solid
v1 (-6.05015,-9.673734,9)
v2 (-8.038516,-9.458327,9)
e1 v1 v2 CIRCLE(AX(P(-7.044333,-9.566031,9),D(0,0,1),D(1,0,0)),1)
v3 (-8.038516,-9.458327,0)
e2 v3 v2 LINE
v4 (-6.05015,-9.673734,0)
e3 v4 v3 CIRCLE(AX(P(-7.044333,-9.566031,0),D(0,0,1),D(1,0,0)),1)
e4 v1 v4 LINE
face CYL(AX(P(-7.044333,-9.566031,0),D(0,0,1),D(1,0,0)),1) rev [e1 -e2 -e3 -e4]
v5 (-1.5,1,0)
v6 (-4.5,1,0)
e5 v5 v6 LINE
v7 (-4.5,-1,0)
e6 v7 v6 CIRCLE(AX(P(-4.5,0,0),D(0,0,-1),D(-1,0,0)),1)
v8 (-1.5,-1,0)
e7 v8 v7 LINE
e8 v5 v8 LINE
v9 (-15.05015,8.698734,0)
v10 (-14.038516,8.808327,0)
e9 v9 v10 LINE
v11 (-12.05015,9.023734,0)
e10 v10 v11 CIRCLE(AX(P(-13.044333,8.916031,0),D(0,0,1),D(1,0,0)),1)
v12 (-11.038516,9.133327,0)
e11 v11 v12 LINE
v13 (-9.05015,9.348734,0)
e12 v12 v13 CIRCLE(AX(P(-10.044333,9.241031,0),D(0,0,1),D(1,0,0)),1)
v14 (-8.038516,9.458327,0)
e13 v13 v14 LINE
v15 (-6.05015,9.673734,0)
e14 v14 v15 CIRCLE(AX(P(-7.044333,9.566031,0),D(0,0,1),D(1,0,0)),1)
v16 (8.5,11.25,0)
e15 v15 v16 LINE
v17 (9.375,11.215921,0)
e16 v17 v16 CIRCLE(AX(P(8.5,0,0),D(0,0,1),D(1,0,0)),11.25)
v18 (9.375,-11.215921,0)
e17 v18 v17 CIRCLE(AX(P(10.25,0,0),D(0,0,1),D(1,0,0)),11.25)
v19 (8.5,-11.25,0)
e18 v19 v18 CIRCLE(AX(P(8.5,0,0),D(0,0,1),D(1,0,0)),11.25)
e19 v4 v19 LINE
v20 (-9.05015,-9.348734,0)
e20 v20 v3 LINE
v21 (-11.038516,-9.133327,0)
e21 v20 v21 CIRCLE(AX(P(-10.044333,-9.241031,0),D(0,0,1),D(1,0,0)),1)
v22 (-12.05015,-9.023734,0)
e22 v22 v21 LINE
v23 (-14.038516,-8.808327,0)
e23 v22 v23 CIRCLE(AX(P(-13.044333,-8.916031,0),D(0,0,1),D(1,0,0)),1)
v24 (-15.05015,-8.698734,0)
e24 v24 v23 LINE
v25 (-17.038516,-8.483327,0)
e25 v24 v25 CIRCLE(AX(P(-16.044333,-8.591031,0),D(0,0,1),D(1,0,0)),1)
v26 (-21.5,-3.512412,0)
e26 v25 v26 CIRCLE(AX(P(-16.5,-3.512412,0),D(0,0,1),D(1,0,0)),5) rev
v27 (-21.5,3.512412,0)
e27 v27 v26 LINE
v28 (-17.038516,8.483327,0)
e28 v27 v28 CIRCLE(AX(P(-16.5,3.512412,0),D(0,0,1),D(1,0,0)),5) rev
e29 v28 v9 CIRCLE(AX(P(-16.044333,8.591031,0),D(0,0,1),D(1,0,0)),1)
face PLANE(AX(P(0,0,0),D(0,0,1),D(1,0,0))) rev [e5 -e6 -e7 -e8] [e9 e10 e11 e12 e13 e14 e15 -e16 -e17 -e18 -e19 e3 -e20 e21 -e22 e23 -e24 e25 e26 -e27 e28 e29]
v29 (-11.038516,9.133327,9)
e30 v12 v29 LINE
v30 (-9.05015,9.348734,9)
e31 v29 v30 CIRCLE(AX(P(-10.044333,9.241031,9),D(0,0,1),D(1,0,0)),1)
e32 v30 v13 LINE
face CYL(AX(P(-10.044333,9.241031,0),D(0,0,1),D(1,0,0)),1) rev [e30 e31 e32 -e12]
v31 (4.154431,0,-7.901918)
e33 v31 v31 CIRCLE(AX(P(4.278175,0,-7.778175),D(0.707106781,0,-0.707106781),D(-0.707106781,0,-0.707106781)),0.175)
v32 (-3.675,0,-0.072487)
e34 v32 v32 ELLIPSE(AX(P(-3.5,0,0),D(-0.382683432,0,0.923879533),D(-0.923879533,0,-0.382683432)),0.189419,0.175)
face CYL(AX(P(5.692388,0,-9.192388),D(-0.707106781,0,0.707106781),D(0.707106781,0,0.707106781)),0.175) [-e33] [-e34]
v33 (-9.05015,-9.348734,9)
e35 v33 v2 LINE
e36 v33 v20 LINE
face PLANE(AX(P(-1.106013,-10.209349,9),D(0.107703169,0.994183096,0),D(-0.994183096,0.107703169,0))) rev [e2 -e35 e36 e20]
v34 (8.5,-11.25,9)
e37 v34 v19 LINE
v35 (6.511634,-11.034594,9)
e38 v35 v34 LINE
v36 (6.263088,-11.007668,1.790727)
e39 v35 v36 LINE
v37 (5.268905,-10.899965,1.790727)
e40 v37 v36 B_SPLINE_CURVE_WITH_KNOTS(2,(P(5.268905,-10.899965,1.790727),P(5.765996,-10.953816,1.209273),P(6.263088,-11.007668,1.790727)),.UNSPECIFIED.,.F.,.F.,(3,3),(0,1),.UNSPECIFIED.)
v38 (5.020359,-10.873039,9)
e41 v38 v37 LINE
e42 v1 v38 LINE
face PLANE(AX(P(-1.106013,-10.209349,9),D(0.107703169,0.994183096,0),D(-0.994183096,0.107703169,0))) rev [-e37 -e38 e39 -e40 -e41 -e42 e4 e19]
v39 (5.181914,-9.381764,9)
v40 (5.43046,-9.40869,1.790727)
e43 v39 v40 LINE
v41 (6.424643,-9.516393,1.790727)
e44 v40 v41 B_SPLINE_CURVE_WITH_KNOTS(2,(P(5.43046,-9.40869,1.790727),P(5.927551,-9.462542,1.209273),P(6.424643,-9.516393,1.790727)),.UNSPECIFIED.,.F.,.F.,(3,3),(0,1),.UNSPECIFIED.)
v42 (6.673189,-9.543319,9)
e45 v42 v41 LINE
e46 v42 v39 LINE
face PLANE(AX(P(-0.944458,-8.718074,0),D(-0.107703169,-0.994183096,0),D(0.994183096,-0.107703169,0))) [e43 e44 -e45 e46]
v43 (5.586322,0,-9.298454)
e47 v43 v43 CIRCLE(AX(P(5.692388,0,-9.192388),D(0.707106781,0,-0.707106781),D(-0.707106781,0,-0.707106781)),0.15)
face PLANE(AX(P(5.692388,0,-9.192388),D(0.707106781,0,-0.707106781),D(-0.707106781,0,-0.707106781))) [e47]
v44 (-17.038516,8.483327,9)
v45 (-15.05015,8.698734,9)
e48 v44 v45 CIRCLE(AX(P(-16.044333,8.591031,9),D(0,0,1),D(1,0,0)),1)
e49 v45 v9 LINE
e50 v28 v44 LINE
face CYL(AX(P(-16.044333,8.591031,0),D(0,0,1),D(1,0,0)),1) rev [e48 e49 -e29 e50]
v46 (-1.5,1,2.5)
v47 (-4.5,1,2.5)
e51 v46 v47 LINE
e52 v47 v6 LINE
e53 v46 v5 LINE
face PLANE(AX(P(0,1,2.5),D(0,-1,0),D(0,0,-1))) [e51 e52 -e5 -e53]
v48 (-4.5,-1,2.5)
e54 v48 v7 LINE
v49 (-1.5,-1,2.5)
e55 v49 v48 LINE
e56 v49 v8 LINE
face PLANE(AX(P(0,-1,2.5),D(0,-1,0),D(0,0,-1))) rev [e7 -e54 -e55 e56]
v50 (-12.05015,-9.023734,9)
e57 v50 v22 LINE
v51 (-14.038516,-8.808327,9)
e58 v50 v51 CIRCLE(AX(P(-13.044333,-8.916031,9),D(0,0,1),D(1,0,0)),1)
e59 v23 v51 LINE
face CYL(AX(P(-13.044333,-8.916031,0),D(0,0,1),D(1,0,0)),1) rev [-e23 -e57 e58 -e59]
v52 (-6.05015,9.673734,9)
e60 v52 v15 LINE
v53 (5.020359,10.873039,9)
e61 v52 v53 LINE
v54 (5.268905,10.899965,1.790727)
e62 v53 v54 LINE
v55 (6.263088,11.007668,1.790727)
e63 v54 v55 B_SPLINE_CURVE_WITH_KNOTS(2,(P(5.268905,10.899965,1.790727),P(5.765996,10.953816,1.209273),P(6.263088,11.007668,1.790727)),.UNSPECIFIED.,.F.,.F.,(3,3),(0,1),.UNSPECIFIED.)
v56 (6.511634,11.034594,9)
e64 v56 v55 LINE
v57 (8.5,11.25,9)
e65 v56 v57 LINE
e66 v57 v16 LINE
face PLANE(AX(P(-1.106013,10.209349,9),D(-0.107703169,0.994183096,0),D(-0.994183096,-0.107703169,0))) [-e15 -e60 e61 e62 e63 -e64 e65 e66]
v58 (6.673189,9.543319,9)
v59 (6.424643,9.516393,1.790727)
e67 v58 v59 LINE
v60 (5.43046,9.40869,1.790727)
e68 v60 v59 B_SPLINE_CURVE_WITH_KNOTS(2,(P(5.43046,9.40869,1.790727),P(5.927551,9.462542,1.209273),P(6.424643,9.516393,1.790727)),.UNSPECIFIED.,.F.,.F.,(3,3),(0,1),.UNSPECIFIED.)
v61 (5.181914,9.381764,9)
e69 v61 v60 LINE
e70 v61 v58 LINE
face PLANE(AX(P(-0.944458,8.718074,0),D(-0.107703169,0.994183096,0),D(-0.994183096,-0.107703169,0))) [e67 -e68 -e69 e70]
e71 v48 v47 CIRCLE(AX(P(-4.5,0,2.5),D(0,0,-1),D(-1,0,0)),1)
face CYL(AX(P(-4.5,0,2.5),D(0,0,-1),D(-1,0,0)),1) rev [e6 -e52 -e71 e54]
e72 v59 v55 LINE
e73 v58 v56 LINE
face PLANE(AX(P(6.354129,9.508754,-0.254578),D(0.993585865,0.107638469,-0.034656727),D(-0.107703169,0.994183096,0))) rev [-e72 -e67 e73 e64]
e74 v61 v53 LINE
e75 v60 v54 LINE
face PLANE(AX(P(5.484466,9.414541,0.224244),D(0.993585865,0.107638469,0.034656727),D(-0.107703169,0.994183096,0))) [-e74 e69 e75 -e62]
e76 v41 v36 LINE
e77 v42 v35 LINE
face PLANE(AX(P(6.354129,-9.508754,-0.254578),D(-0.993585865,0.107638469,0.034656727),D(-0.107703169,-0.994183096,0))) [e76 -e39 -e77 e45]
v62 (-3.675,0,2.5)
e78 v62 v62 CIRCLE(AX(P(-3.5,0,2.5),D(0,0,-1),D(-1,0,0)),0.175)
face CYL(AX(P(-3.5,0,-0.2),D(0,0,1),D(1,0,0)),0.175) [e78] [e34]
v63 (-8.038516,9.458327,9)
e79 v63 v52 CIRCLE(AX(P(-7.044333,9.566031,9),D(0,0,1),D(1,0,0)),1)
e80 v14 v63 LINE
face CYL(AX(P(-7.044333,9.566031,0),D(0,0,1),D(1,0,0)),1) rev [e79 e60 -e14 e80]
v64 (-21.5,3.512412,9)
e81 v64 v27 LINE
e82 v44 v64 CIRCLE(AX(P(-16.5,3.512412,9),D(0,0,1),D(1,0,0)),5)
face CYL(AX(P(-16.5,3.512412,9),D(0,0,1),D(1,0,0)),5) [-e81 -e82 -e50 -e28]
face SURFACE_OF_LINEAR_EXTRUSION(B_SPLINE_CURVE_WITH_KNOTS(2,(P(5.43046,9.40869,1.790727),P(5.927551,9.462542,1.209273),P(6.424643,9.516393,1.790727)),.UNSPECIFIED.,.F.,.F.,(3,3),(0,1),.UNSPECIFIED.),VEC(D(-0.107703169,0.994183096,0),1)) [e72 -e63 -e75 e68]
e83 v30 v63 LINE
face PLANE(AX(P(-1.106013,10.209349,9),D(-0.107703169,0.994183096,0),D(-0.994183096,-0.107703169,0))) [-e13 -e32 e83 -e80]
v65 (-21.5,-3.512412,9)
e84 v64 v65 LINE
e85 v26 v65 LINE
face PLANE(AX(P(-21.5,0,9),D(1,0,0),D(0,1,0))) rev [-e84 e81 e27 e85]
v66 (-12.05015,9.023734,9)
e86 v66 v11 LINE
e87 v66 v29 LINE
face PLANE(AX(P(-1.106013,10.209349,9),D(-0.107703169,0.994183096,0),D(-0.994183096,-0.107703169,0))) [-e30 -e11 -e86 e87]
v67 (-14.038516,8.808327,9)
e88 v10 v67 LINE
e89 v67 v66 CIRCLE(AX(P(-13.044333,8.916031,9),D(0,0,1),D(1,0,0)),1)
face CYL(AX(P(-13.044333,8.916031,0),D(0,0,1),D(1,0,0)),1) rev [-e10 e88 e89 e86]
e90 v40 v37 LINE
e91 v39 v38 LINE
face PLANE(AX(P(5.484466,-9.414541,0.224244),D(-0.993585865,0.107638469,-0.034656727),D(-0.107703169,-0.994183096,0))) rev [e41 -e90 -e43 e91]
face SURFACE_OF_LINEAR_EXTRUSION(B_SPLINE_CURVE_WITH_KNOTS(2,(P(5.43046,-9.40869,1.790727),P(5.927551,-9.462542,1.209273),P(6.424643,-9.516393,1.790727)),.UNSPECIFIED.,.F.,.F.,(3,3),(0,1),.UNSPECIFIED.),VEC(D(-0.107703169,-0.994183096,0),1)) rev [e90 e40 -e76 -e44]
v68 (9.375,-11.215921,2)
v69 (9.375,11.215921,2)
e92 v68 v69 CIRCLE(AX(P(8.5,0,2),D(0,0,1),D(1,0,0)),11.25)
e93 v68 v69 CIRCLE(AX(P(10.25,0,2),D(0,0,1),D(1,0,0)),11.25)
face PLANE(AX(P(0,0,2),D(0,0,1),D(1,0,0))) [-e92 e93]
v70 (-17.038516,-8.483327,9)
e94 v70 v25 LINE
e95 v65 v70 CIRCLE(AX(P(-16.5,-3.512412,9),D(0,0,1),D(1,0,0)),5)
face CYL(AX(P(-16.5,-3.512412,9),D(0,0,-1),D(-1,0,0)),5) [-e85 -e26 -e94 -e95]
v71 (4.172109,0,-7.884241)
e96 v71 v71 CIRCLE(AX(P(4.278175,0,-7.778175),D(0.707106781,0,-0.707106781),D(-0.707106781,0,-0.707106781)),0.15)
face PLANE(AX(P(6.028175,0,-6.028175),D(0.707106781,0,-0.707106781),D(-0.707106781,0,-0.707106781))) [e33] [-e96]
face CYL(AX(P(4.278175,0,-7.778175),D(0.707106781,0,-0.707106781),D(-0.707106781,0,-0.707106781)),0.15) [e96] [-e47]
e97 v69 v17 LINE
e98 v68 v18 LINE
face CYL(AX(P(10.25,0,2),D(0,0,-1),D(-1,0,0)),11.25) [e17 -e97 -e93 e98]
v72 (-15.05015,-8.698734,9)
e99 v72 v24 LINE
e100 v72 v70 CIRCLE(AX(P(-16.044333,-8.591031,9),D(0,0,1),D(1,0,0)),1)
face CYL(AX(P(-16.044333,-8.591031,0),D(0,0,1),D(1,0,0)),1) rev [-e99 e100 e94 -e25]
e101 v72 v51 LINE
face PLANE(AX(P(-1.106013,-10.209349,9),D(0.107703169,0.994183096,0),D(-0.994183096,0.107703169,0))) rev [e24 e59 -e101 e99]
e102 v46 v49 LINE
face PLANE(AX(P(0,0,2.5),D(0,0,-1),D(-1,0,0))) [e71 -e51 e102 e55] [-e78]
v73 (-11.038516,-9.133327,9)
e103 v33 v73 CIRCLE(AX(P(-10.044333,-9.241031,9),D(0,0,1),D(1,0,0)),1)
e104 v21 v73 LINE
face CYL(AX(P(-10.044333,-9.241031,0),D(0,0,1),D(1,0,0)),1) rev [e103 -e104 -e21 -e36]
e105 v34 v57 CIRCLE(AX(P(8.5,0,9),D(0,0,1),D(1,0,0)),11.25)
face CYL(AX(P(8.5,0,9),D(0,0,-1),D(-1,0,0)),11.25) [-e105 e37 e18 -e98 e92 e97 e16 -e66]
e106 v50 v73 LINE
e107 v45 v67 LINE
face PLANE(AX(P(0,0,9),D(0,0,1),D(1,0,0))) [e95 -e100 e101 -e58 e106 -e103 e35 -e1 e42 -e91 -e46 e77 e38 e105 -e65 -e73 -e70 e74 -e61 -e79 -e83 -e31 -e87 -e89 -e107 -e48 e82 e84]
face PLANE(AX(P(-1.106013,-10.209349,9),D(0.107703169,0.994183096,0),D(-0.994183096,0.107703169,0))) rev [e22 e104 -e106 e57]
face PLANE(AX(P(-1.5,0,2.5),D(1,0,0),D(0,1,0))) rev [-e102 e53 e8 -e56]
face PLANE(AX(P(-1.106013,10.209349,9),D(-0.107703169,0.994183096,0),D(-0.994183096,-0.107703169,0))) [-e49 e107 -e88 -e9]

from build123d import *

# Parameters (mm, degrees)
SENSOR_HEIGHT_DEPTH               = 9
SENSOR_LIP_HEIGHT_DEPTH           = 2
SHORT_SIDE_EDGE_ROUNDING_R        = 5
SENSOR_HOLES_R                    = 1
EXTRUDED_SENSOR_HOLES_DEPTH       = 26.880736079
BOTTOM_TRIANGLE_CUT_DEPTH         = 1.5
TOP_TRIANGLE_CUT_DEPTH            = 1.5
FILAMENT_HOLE_CUT_DEPTH           = 2.5
FILAMENT_PROFILE_R                = 0.175
SENSING_START                     = -2
SENSING_FILAMENT_R                = 0.175
SENSING_FILAMENT_R_2              = 0.15
SENSING_PORTION_OF_FILAMENT_DEPTH = 2


# Read off the part's stored shape, not the designer's step: Sensor Lip Height
with BuildPart() as part:
    # Basic Sensor Dimensions → Sensor Height (new body)
    with BuildSketch(Plane.XY):
        with BuildLine():
            Line((-21.5, 8), (-21.5, -8))
            Line((-21.5, -8), (8.5, -11.25))
            ThreePointArc((8.5, -11.25), (19.75, 0), (8.5, 11.25))
            Line((8.5, 11.25), (-21.5, 8))
        make_face()
    extrude(amount=SENSOR_HEIGHT_DEPTH)

    # Sensor Lip Height outline → Sensor Lip Height (add)
    with BuildSketch(Plane.XY):
        with BuildLine():
            ThreePointArc((9.375, -11.215920604), (21.5, 0), (9.375, 11.215920604))
            ThreePointArc((9.375, 11.215920604), (19.75, 0), (9.375, -11.215920604))
        make_face()
    extrude(amount=SENSOR_LIP_HEIGHT_DEPTH)

    # Short Side Edge Rounding
    short_side_edge_rounding_edges = [part.edges().sort_by_distance(p)[0] for p in [
        (-21.5, -8, 4.5),
        (-21.5, 8, 4.5),
    ]]
    fillet(short_side_edge_rounding_edges, radius=SHORT_SIDE_EDGE_ROUNDING_R)

    # Sensor Holes → Extruded Sensor Holes (cut, through all)
    with BuildSketch(Plane.XY.offset(9)):
        with Locations((-16.044332748, -8.591030619)):
            Circle(SENSOR_HOLES_R)
        with Locations((-13.044332748, -8.916030619)):
            Circle(SENSOR_HOLES_R)
        with Locations((-10.044332748, -9.241030619)):
            Circle(SENSOR_HOLES_R)
        with Locations((-7.044332748, -9.566030619)):
            Circle(SENSOR_HOLES_R)
        with Locations((-10.044332748, 9.241030619)):
            Circle(SENSOR_HOLES_R)
        with Locations((-7.044332748, 9.566030619)):
            Circle(SENSOR_HOLES_R)
        with Locations((-13.044332748, 8.916030619)):
            Circle(SENSOR_HOLES_R)
        with Locations((-16.044332748, 8.591030619)):
            Circle(SENSOR_HOLES_R)
    extrude(amount=-EXTRUDED_SENSOR_HOLES_DEPTH, mode=Mode.SUBTRACT)

    # Bottom Triangle → Bottom Triangle Cut (cut)
    with BuildSketch(Plane(origin=(-1.106012767, -10.209348617, 0), x_dir=(0.9941830955390242, -0.10770316868339427, 0), z_dir=(-0.10770316868339427, -0.9941830955390242, 0))):
        with BuildLine():
            Line((6.91221696, 1.5), (6.91221696, 9))
            Line((6.91221696, 9), (6.16221696, 9))
            Line((6.16221696, 9), (6.41221696, 1.790726708))
            add(Edge.make_bspline(
                [(6.41221696, 1.790726708), (6.66221696, 1.5), (6.91221696, 1.5)],
                knots=[0, 0, 0, 0.5, 0.5, 0.5], degree=2))
        make_face()
        with BuildLine():
            Line((7.41221696, 1.790726708), (7.66221696, 9))
            Line((7.66221696, 9), (6.91221696, 9))
            Line((6.91221696, 9), (6.91221696, 1.5))
            add(Edge.make_bspline(
                [(6.91221696, 1.5), (7.16221696, 1.5), (7.41221696, 1.790726708)],
                knots=[0.5, 0.5, 0.5, 1, 1, 1], degree=2))
        make_face()
    extrude(amount=-BOTTOM_TRIANGLE_CUT_DEPTH, mode=Mode.SUBTRACT)

    # Top Triangle → Top Triangle Cut (cut)
    with BuildSketch(Plane(origin=(-1.106012767, 10.209348617, 0), x_dir=(0.9941830955390242, 0.10770316868339432, 0), z_dir=(-0.10770316868339432, 0.9941830955390242, 0))):
        with BuildLine():
            Line((6.91221696, -9), (7.66221696, -9))
            Line((7.66221696, -9), (7.41221696, -1.790726708))
            add(Edge.make_bspline(
                [(6.91221696, -1.5), (7.16221696, -1.5), (7.41221696, -1.790726708)],
                knots=[0.5, 0.5, 0.5, 1, 1, 1], degree=2))
            Line((6.91221696, -1.5), (6.91221696, -9))
        make_face()
        with BuildLine():
            Line((6.16221696, -9), (6.91221696, -9))
            Line((6.91221696, -9), (6.91221696, -1.5))
            add(Edge.make_bspline(
                [(6.41221696, -1.790726708), (6.66221696, -1.5), (6.91221696, -1.5)],
                knots=[0, 0, 0, 0.5, 0.5, 0.5], degree=2))
            Line((6.41221696, -1.790726708), (6.16221696, -9))
        make_face()
    extrude(amount=-TOP_TRIANGLE_CUT_DEPTH, mode=Mode.SUBTRACT)

    # Filament Hole → Filament Hole Cut (cut)
    with BuildSketch(Plane(origin=(0, 0, 0), x_dir=(-1, 0, 0), z_dir=(0, 0, -1))):
        with BuildLine():
            Line((4.5, 1), (1.5, 1))
            Line((1.5, 1), (1.5, -1))
            Line((1.5, -1), (4.5, -1))
            ThreePointArc((4.5, -1), (5.5, 0), (4.5, 1))
        make_face()
    extrude(amount=-FILAMENT_HOLE_CUT_DEPTH, mode=Mode.SUBTRACT)

    # Filament: sweep along a curve in space
    with BuildLine() as filament_path:
        Line((-3.5, 0, 0), (-3.5, 0, 2.5))
        Line((-3.5, 0, 0), (5.692388155, 0, -9.192388155))
    # Filament profile (on start of the path) → Filament (sweep)
    with BuildSketch(Plane(origin=(5.692388155, 0, -9.192388155), x_dir=(0.7071067811865488, 0, 0.7071067811865464), z_dir=(-0.7071067811865464, 0, 0.7071067811865488))):
        Circle(FILAMENT_PROFILE_R)
    sweep(path=filament_path.line, transition=Transition.RIGHT)

    # Sensing Filament → Sensing Portion of Filament (cut)
    with BuildSketch(Plane(origin=(7.442388155, 0, -7.442388155), x_dir=(-0.7071067811865488, 0, -0.7071067811865462), z_dir=(0.7071067811865462, 0, -0.7071067811865488)).offset(SENSING_START)):
        with Locations((2.474873734, 0)):
            Circle(SENSING_FILAMENT_R)
        with Locations((2.474873734, 0)):
            Circle(SENSING_FILAMENT_R_2, mode=Mode.SUBTRACT)
    extrude(amount=SENSING_PORTION_OF_FILAMENT_DEPTH, mode=Mode.SUBTRACT)


solid = part.part
